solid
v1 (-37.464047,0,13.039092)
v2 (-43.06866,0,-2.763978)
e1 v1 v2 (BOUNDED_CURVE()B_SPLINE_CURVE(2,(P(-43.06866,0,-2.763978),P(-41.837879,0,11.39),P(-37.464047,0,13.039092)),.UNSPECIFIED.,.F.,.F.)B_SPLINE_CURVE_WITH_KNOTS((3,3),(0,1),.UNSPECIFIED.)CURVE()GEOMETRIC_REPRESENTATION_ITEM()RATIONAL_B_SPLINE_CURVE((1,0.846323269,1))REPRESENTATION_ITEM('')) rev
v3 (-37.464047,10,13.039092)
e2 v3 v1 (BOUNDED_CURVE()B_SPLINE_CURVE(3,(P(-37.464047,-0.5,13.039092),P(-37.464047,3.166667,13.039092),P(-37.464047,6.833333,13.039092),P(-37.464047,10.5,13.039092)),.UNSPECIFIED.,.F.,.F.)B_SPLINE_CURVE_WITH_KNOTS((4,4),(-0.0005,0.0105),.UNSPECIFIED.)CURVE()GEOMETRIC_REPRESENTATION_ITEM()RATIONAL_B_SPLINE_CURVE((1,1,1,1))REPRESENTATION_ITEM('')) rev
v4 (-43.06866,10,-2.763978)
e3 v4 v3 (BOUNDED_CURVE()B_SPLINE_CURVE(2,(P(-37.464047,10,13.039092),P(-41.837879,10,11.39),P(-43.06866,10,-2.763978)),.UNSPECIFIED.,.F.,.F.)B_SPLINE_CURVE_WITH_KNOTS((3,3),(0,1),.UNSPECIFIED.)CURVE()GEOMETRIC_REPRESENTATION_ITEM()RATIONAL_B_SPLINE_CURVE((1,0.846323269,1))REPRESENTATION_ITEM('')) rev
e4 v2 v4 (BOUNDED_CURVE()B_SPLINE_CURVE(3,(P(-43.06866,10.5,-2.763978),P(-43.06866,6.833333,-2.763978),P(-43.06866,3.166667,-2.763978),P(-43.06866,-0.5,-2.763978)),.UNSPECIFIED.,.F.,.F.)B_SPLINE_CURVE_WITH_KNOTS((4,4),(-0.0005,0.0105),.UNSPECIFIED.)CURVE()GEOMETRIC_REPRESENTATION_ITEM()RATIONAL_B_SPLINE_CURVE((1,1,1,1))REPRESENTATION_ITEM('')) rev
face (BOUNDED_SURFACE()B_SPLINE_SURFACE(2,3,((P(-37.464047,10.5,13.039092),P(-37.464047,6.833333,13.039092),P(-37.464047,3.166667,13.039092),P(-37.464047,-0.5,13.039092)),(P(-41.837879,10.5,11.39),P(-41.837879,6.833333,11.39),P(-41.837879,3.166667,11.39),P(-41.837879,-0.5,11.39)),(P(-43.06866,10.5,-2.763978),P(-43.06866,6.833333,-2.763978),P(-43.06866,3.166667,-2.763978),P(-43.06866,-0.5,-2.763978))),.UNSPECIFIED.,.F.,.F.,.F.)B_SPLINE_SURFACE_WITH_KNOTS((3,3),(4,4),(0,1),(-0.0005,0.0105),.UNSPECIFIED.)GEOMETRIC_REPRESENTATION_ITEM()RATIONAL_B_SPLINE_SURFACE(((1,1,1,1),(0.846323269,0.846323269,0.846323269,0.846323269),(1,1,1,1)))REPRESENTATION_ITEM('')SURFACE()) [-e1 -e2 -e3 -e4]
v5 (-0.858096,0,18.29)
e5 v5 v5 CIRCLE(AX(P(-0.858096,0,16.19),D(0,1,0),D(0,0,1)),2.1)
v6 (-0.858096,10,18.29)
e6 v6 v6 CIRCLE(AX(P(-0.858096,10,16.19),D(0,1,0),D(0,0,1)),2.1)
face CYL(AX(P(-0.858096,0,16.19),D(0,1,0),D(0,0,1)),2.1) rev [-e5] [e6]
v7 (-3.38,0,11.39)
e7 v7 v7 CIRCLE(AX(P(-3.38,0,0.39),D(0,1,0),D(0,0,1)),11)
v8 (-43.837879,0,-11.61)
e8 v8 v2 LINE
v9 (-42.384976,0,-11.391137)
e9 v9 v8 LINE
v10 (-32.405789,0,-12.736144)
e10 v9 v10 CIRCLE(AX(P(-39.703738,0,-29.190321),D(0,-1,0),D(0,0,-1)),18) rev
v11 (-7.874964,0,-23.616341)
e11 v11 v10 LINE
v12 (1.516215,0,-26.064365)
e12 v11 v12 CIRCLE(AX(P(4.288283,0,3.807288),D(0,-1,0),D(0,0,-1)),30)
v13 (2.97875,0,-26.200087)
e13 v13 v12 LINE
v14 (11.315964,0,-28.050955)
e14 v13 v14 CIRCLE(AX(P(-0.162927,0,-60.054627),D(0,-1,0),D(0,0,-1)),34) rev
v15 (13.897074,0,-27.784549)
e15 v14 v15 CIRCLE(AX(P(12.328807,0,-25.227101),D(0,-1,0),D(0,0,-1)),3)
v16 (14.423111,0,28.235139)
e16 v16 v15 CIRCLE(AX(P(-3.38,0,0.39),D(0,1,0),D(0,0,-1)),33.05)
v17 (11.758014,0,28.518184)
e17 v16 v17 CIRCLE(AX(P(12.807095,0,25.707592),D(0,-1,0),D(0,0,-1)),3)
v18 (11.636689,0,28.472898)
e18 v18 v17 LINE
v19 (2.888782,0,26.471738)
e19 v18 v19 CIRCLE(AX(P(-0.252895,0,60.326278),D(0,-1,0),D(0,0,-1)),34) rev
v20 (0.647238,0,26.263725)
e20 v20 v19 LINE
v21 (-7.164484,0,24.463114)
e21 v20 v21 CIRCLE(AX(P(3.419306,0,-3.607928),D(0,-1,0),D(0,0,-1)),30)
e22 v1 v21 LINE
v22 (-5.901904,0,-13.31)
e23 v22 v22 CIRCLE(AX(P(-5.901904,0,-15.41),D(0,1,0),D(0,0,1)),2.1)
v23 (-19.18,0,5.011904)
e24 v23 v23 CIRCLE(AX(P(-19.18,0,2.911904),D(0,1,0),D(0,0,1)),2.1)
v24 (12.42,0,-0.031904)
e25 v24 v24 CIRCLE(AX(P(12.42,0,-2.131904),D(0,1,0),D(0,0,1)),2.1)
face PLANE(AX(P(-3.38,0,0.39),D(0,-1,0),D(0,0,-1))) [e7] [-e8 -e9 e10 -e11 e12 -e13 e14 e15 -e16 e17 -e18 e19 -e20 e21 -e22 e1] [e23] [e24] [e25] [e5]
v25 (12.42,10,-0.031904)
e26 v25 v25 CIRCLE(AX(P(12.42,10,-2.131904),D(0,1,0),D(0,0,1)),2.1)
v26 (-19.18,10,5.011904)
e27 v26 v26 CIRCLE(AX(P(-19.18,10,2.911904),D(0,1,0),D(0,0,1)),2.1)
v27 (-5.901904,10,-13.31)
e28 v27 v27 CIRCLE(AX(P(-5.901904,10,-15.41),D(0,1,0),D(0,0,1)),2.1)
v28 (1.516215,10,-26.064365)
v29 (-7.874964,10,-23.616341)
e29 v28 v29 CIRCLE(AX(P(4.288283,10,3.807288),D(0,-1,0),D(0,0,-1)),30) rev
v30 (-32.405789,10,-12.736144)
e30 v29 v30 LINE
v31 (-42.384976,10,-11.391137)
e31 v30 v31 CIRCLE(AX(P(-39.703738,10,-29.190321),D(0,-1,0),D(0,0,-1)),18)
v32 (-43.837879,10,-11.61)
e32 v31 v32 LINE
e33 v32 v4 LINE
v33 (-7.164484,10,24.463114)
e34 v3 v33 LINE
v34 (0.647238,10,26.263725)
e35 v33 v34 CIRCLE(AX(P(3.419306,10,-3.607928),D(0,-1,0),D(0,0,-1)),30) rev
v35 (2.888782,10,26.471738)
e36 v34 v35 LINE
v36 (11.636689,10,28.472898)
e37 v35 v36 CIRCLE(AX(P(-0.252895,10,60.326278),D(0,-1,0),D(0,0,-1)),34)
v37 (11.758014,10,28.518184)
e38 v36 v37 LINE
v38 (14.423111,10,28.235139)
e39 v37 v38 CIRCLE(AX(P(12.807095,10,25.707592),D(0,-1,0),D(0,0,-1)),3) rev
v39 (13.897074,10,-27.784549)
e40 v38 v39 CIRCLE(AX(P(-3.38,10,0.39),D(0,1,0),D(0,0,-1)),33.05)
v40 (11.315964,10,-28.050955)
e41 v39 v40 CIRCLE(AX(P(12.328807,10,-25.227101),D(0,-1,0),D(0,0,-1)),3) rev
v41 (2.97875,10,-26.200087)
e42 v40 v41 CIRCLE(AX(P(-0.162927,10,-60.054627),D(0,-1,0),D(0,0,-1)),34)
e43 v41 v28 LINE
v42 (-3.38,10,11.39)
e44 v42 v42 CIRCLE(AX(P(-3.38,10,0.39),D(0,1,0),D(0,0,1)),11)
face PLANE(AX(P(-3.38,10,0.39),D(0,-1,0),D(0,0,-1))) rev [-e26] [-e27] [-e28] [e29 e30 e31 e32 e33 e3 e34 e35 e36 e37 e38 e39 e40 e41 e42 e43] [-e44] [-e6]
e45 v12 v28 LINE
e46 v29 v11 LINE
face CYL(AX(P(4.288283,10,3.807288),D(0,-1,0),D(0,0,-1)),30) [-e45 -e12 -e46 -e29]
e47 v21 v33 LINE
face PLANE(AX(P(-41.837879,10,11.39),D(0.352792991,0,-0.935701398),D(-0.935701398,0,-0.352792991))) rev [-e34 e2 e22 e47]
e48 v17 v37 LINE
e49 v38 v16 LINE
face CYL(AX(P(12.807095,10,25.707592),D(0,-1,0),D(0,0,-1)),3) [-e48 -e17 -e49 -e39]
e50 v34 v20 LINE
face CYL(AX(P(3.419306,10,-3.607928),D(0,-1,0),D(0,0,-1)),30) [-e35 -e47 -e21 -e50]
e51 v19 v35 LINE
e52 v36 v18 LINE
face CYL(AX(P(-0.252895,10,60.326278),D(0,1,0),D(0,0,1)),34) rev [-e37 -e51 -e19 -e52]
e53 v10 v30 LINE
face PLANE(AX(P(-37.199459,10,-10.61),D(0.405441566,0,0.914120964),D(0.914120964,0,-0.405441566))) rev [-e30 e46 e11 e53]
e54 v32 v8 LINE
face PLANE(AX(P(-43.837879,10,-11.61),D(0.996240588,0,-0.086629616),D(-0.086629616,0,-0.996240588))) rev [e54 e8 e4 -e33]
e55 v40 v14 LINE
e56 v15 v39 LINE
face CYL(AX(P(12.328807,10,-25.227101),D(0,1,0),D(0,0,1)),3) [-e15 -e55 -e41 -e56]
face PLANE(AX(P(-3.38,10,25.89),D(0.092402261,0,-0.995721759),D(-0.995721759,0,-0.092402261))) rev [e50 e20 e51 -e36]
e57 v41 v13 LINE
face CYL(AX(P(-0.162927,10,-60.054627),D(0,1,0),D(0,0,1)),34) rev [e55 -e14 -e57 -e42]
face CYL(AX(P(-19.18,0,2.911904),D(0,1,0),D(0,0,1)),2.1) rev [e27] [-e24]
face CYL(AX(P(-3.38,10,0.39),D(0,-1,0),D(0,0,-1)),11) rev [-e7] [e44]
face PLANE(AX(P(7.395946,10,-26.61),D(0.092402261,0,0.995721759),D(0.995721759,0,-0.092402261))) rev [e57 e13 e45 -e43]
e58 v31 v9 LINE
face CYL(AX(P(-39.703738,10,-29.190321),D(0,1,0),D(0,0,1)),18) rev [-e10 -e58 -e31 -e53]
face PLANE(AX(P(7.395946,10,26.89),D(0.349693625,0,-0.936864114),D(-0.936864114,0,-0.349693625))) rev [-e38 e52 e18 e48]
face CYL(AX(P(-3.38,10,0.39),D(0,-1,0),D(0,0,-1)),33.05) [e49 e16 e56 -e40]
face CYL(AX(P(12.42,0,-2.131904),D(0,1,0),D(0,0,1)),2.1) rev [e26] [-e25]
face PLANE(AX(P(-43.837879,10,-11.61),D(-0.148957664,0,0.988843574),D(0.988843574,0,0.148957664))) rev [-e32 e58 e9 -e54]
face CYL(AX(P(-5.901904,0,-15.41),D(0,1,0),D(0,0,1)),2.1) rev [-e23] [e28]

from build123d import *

# Parameters (mm, degrees)
SKETCH1_R           = 11
BOSS_EXTRUDE1_DEPTH = 10
SKETCH2_R           = 2.1
CUT_EXTRUDE1_DEPTH  = 10
FILLET2_R           = 18
FILLET3_R           = 30
FILLET4_R           = 34
FILLET7_R           = 3


with BuildPart() as part:
    # Sketch1 → Boss-Extrude1 (new body)
    with BuildSketch(Plane(origin=(0, 0, 0), x_dir=(1, 0, 0), z_dir=(0, 1, 0))):
        with BuildLine():
            Line((-43.837879331, 11.61), (-37.199459056, 10.61))
            Line((-37.199459056, 10.61), (-3.38, 25.61))
            Line((-3.38, 25.61), (7.395945787, 26.61))
            Line((7.395945787, 26.61), (12.62, 28.528895207))
            ThreePointArc((12.62, 28.528895207), (29.66875295, -0.102896427), (13.12, -29.026558802))
            Line((13.12, -29.026558802), (7.395945787, -26.89))
            Line((7.395945787, -26.89), (-3.38, -25.89))
            Line((-3.38, -25.89), (-41.837879331, -11.39))
            Line((-41.837879331, -11.39), (-43.837879331, 11.61))
        make_face()
        with Locations(Location((-3.38, -0.39, 0), (0, 0, 270))):
            Circle(SKETCH1_R, mode=Mode.SUBTRACT)
    extrude(amount=BOSS_EXTRUDE1_DEPTH)

    # Sketch2 → Cut-Extrude1 (cut)
    with BuildSketch(Plane(origin=(0, 10, 0), x_dir=(1, 0, 0), z_dir=(0, 1, 0))):
        with Locations(Location((12.42, 2.131904043, 0), (0, 0, 270))):
            Circle(SKETCH2_R)
        with Locations(Location((-0.858095957, -16.19, 0), (0, 0, 270))):
            Circle(SKETCH2_R)
        with Locations(Location((-19.18, -2.911904043, 0), (0, 0, 270))):
            Circle(SKETCH2_R)
        with Locations(Location((-5.901904043, 15.41, 0), (0, 0, 270))):
            Circle(SKETCH2_R)
    extrude(amount=-CUT_EXTRUDE1_DEPTH, mode=Mode.SUBTRACT)

    # Fillet1
    # an asymmetric fillet: 18, 12 mm, written as the material it takes off along each edge
    with BuildSketch(Plane(origin=(-41.837879331, -35.518473591, 11.39), x_dir=(0.9357013977145019, 0, 0.3527929907397927), z_dir=(0, 1, 0))) as fillet1_piece_1:
        with BuildLine():
            Bezier((4.674389222, 0), (0, 0), (-6.145067451, 12.809686203), weights=[1, 0.846323269, 1])
            Line((-6.145067451, 12.809686203), (0, 0))
            Line((0, 0), (4.674389222, 0))
        make_face()
    extrude(amount=81.036947182, mode=Mode.SUBTRACT)

    # Fillet2
    fillet2_edges = [part.edges().sort_by_distance(p)[0] for p in [
        (-37.199459056, 5, -10.61),
    ]]
    fillet(fillet2_edges, radius=FILLET2_R)

    # Fillet3
    fillet3_edges = [part.edges().sort_by_distance(p)[0] for p in [
        (-3.38, 5, -25.61),
        (-3.38, 5, 25.89),
    ]]
    fillet(fillet3_edges, radius=FILLET3_R)

    # Fillet4
    fillet4_edges = [part.edges().sort_by_distance(p)[0] for p in [
        (7.395945787, 5, -26.61),
        (7.395945787, 5, 26.89),
    ]]
    fillet(fillet4_edges, radius=FILLET4_R)

    # Fillet7
    fillet7_edges = [part.edges().sort_by_distance(p)[0] for p in [
        (12.62, 5, -28.528895207),
        (13.12, 5, 29.026558802),
    ]]
    fillet(fillet7_edges, radius=FILLET7_R)


solid = part.part
